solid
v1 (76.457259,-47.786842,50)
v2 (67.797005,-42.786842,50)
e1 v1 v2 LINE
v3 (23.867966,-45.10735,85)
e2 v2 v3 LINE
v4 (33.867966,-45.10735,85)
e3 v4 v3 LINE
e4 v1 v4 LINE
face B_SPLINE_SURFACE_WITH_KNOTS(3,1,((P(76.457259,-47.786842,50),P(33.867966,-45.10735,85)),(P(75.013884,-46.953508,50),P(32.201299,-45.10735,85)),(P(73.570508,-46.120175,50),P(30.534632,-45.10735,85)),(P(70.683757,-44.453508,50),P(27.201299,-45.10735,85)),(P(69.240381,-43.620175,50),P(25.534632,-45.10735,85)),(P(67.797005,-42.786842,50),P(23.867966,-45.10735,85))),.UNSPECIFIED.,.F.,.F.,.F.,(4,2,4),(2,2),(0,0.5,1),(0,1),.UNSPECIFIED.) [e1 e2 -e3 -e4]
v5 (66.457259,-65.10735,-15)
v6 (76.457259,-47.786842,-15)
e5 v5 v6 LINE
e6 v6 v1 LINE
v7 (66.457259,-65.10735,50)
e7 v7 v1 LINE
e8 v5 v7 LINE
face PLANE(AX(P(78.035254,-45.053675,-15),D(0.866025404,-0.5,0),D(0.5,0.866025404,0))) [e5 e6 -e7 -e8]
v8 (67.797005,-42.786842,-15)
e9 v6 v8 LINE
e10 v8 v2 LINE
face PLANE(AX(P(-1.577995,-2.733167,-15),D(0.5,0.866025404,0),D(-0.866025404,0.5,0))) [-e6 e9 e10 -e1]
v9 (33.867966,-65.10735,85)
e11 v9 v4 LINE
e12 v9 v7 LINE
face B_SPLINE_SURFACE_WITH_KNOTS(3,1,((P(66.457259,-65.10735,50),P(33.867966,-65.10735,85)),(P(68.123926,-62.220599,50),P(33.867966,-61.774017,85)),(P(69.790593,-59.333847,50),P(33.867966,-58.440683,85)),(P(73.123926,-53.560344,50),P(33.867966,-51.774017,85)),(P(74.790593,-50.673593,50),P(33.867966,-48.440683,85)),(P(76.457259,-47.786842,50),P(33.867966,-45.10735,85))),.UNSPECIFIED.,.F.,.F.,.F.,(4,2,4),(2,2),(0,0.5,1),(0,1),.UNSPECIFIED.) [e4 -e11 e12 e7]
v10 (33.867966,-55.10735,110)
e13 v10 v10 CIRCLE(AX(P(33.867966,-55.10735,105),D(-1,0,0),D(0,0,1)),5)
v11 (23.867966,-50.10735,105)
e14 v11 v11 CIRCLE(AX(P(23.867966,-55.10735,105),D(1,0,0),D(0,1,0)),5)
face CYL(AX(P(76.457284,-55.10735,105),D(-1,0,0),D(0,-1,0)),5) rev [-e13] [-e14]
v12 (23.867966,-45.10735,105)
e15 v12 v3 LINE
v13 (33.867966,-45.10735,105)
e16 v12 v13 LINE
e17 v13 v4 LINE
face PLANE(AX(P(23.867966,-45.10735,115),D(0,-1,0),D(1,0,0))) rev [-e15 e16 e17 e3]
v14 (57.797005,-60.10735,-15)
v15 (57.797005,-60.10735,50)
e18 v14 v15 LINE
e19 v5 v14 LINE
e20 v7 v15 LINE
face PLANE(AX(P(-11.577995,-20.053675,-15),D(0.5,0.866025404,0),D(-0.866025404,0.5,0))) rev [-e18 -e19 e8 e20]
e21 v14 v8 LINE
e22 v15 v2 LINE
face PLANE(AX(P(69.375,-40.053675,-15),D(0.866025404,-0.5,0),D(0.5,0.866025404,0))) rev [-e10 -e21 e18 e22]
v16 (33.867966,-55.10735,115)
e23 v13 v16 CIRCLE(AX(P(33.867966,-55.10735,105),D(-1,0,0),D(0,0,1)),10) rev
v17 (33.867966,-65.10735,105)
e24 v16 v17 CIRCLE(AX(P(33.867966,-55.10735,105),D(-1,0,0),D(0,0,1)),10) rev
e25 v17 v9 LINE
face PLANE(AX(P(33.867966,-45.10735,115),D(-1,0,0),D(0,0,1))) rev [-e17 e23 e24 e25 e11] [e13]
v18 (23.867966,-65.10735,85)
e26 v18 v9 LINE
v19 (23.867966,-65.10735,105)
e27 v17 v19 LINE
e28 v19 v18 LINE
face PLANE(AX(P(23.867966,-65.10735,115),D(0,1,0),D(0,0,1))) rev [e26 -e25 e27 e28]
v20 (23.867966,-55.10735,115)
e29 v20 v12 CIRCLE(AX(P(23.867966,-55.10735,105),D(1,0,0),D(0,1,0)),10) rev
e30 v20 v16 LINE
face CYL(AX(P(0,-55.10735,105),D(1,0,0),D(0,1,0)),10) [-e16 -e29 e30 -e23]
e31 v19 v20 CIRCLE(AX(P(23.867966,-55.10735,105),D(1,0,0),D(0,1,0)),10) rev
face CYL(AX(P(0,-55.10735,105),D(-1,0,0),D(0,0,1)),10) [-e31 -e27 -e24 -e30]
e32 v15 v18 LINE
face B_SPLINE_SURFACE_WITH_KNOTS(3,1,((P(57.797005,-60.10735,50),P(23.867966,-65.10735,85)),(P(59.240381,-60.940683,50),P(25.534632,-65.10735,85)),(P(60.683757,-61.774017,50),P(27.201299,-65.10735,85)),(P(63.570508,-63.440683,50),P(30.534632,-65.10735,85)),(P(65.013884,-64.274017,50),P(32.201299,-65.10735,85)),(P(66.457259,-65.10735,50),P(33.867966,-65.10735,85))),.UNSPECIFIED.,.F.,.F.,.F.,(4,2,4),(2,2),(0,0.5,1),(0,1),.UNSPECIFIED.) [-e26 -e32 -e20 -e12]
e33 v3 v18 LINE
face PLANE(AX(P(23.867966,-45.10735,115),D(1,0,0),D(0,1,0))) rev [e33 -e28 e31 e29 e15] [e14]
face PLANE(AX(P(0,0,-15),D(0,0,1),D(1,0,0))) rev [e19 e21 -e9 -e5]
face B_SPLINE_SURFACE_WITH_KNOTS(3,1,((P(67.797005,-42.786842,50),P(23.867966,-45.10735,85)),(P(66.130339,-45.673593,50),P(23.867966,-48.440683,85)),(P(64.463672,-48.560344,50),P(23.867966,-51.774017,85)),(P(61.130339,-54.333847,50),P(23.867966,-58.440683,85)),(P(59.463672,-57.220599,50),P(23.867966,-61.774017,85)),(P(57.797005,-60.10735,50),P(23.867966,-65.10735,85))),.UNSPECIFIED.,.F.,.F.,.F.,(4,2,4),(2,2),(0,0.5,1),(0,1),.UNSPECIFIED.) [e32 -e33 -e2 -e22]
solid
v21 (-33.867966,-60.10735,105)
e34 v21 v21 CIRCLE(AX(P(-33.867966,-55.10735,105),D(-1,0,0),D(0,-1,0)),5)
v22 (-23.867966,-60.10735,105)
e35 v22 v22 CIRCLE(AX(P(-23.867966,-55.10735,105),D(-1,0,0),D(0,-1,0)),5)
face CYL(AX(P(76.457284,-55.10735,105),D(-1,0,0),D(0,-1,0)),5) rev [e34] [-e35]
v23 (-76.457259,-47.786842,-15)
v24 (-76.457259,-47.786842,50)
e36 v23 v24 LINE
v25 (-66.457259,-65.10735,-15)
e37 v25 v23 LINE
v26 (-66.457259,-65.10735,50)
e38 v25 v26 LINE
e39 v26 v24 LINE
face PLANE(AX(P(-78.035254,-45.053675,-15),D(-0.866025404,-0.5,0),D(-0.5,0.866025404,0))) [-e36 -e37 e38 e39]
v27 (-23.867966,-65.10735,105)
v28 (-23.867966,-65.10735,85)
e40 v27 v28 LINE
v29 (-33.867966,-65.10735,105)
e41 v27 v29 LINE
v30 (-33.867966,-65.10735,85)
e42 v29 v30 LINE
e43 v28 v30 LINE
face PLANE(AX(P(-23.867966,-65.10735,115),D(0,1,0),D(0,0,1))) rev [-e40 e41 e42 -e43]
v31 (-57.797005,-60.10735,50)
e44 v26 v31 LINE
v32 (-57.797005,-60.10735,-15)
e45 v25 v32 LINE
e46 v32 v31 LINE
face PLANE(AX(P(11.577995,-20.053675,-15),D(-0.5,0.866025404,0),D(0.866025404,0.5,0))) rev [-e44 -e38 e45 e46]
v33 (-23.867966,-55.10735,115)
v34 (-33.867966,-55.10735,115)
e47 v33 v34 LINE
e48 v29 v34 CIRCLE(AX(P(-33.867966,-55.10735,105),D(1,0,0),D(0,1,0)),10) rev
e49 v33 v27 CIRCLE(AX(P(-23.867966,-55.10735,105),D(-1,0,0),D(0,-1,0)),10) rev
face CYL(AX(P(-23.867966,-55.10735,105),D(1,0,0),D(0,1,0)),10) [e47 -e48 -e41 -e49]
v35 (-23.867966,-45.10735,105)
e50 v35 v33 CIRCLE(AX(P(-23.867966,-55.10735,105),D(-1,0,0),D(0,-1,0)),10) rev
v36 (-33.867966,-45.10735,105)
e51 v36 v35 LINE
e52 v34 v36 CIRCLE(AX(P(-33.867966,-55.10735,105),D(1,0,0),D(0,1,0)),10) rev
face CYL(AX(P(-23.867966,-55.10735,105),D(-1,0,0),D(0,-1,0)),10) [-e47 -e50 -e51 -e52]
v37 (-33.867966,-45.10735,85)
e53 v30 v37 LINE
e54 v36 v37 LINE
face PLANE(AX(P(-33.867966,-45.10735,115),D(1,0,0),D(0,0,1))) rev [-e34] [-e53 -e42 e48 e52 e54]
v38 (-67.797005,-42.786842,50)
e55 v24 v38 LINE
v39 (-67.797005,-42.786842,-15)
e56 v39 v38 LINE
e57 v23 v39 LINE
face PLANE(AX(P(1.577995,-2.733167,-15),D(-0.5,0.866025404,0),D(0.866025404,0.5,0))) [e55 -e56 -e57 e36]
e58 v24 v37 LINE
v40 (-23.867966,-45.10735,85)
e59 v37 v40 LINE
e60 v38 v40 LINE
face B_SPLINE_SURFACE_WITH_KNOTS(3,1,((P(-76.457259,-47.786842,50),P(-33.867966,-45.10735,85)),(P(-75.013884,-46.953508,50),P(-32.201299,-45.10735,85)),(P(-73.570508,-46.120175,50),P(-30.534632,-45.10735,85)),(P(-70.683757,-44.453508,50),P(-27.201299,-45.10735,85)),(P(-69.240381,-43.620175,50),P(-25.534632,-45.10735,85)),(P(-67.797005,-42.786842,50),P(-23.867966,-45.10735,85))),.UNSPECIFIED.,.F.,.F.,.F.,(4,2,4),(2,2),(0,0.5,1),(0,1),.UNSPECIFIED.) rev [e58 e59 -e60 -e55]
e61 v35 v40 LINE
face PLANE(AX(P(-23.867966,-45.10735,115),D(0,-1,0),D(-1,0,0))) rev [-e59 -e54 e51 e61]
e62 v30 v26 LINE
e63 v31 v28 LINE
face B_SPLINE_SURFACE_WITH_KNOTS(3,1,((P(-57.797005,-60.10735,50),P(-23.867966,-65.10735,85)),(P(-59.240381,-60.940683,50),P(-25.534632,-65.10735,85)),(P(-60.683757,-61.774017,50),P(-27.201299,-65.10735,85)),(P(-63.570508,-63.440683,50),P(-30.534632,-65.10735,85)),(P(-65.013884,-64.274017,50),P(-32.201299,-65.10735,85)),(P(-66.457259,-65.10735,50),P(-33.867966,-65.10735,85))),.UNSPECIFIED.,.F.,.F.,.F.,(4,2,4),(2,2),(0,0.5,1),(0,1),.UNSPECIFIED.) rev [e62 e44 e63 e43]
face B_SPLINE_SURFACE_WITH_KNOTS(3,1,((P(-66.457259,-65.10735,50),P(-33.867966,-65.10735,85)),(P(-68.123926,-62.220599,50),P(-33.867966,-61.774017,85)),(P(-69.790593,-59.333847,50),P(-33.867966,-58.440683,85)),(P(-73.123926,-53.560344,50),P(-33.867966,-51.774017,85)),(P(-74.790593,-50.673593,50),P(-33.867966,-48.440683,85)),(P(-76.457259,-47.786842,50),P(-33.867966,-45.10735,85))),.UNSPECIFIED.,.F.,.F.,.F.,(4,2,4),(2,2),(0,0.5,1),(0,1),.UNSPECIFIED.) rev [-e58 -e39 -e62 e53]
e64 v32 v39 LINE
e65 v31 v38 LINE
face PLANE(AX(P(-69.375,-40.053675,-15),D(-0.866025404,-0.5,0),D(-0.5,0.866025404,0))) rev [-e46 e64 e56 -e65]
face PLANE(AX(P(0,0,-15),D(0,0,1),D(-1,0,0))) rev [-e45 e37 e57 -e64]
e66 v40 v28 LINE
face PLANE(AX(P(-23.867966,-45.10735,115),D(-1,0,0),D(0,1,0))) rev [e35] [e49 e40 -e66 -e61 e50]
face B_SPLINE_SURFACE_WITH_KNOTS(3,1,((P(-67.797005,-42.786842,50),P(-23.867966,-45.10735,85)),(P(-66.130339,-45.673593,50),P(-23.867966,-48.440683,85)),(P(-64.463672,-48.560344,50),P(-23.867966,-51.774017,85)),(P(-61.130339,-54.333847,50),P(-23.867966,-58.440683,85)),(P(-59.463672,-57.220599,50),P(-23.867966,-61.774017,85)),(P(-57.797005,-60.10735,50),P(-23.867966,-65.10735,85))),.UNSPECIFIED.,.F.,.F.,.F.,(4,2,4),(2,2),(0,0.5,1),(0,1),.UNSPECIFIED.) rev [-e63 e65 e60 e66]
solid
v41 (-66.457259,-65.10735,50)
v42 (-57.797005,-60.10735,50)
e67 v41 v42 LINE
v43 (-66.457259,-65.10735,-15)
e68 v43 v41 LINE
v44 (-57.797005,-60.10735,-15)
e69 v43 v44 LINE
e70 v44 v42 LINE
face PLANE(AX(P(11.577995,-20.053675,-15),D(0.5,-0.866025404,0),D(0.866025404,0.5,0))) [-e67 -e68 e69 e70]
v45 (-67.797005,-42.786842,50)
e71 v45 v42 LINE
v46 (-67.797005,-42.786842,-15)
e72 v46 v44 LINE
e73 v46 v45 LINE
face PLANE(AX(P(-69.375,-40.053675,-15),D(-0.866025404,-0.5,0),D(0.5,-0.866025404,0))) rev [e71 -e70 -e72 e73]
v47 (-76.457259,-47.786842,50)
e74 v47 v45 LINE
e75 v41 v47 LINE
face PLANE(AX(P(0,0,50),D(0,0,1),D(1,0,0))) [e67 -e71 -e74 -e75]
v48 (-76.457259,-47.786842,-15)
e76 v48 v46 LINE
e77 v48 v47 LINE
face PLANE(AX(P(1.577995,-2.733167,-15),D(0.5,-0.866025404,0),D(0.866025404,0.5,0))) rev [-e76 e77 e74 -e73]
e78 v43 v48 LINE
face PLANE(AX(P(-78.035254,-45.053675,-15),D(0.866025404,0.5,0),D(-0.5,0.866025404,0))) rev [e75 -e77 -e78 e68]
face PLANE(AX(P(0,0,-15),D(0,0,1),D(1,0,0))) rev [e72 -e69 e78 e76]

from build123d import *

# Parameters (mm, degrees)
BOSS_EXTRUDE1_DEPTH        = 50
BOSS_EXTRUDE1_DEPTH_BACK   = 15
BOSS_EXTRUDE1_2_DEPTH      = 50
BOSS_EXTRUDE1_2_DEPTH_BACK = 15
BOSS_EXTRUDE2_START        = 35
SKETCH2_W                  = 10
SKETCH2_H                  = 20
BOSS_EXTRUDE2_DEPTH        = 30
SKETCH3_R                  = 5
CUT_EXTRUDE1_DEPTH         = 173.149999612
FILLET3_R                  = 10
FILLET4_R                  = 10


with BuildPart() as part:
    # Sketch1 → Boss-Extrude1 (new, two sides: drawn at the far end of the back side and taken through both)
    with BuildSketch(Plane.XY.offset(-BOSS_EXTRUDE1_DEPTH_BACK)):
        Polygon((-66.457259422, -65.10734985), (-57.797005384, -60.10734985), (-67.797005384, -42.786841774), (-76.457259422, -47.786841774), align=None)
    extrude(amount=BOSS_EXTRUDE1_DEPTH + BOSS_EXTRUDE1_DEPTH_BACK)


with BuildPart() as body_2:
    # Sketch1 → Boss-Extrude1 2 (new, two sides: drawn at the far end of the back side and taken through both)
    with BuildSketch(Plane.XY.offset(-BOSS_EXTRUDE1_2_DEPTH_BACK)):
        Polygon((57.797005384, -60.10734985), (66.457259422, -65.10734985), (76.457259422, -47.786841774), (67.797005384, -42.786841774), align=None)
    extrude(amount=BOSS_EXTRUDE1_2_DEPTH + BOSS_EXTRUDE1_2_DEPTH_BACK)



with BuildPart() as body_3:
    # Sketch2 → Boss-Extrude2 (new body)
    with BuildSketch(Plane.XY.offset(50).offset(BOSS_EXTRUDE2_START)):
        with Locations((28.867965831, -55.10734985)):
            Rectangle(SKETCH2_W, SKETCH2_H)
    extrude(amount=BOSS_EXTRUDE2_DEPTH)


with BuildPart() as body_2_1:
    add(body_2.part)

    add(body_3.part)  # loft2 joins it to this body
    # loft from a face of the part (loft2)
    loft([body_2_1.faces().sort_by_distance((67.127132403, -53.947095812, 50))[0], body_2_1.faces().sort_by_distance((28.867965831, -55.10734985, 85))[0]])


with BuildPart() as body_3_2:
    # Mirror3: mirrored copy
    add(body_2_1.part.mirror(Plane.ZY))


with BuildPart() as cut_extrude1_tool:
    # Sketch3 → Cut-Extrude1 (new, through all)
    with BuildSketch(Plane.ZY.offset(33.867965831)):
        with Locations(Location((105, -55.10734985, 0), (0, 0, 270))):
            Circle(SKETCH3_R)
    extrude(amount=-CUT_EXTRUDE1_DEPTH)


with BuildPart() as body_2_2:
    add(body_2_1.part)

    # Cut-Extrude1: cut by cut_extrude1_tool
    add(cut_extrude1_tool.part, mode=Mode.SUBTRACT)

    # Fillet4
    fillet4_edges = [body_2_2.edges().sort_by_distance(p)[0] for p in [
        (28.867965831, -45.10734985, 115),
        (28.867965831, -65.10734985, 115),
    ]]
    fillet(fillet4_edges, radius=FILLET4_R - 0.0001)  # a hair under: the kernel refuses the full size


with BuildPart() as body_3_2_1:
    add(body_3_2.part)

    # Cut-Extrude1: cut by cut_extrude1_tool
    add(cut_extrude1_tool.part, mode=Mode.SUBTRACT)

    # Fillet3
    fillet3_edges = [body_3_2_1.edges().sort_by_distance(p)[0] for p in [
        (-28.867965831, -65.10734985, 115),
        (-28.867965831, -45.10734985, 115),
    ]]
    fillet(fillet3_edges, radius=FILLET3_R - 0.0001)  # a hair under: the kernel refuses the full size


solid = Compound([part.part, body_2_2.part, body_3_2_1.part])
